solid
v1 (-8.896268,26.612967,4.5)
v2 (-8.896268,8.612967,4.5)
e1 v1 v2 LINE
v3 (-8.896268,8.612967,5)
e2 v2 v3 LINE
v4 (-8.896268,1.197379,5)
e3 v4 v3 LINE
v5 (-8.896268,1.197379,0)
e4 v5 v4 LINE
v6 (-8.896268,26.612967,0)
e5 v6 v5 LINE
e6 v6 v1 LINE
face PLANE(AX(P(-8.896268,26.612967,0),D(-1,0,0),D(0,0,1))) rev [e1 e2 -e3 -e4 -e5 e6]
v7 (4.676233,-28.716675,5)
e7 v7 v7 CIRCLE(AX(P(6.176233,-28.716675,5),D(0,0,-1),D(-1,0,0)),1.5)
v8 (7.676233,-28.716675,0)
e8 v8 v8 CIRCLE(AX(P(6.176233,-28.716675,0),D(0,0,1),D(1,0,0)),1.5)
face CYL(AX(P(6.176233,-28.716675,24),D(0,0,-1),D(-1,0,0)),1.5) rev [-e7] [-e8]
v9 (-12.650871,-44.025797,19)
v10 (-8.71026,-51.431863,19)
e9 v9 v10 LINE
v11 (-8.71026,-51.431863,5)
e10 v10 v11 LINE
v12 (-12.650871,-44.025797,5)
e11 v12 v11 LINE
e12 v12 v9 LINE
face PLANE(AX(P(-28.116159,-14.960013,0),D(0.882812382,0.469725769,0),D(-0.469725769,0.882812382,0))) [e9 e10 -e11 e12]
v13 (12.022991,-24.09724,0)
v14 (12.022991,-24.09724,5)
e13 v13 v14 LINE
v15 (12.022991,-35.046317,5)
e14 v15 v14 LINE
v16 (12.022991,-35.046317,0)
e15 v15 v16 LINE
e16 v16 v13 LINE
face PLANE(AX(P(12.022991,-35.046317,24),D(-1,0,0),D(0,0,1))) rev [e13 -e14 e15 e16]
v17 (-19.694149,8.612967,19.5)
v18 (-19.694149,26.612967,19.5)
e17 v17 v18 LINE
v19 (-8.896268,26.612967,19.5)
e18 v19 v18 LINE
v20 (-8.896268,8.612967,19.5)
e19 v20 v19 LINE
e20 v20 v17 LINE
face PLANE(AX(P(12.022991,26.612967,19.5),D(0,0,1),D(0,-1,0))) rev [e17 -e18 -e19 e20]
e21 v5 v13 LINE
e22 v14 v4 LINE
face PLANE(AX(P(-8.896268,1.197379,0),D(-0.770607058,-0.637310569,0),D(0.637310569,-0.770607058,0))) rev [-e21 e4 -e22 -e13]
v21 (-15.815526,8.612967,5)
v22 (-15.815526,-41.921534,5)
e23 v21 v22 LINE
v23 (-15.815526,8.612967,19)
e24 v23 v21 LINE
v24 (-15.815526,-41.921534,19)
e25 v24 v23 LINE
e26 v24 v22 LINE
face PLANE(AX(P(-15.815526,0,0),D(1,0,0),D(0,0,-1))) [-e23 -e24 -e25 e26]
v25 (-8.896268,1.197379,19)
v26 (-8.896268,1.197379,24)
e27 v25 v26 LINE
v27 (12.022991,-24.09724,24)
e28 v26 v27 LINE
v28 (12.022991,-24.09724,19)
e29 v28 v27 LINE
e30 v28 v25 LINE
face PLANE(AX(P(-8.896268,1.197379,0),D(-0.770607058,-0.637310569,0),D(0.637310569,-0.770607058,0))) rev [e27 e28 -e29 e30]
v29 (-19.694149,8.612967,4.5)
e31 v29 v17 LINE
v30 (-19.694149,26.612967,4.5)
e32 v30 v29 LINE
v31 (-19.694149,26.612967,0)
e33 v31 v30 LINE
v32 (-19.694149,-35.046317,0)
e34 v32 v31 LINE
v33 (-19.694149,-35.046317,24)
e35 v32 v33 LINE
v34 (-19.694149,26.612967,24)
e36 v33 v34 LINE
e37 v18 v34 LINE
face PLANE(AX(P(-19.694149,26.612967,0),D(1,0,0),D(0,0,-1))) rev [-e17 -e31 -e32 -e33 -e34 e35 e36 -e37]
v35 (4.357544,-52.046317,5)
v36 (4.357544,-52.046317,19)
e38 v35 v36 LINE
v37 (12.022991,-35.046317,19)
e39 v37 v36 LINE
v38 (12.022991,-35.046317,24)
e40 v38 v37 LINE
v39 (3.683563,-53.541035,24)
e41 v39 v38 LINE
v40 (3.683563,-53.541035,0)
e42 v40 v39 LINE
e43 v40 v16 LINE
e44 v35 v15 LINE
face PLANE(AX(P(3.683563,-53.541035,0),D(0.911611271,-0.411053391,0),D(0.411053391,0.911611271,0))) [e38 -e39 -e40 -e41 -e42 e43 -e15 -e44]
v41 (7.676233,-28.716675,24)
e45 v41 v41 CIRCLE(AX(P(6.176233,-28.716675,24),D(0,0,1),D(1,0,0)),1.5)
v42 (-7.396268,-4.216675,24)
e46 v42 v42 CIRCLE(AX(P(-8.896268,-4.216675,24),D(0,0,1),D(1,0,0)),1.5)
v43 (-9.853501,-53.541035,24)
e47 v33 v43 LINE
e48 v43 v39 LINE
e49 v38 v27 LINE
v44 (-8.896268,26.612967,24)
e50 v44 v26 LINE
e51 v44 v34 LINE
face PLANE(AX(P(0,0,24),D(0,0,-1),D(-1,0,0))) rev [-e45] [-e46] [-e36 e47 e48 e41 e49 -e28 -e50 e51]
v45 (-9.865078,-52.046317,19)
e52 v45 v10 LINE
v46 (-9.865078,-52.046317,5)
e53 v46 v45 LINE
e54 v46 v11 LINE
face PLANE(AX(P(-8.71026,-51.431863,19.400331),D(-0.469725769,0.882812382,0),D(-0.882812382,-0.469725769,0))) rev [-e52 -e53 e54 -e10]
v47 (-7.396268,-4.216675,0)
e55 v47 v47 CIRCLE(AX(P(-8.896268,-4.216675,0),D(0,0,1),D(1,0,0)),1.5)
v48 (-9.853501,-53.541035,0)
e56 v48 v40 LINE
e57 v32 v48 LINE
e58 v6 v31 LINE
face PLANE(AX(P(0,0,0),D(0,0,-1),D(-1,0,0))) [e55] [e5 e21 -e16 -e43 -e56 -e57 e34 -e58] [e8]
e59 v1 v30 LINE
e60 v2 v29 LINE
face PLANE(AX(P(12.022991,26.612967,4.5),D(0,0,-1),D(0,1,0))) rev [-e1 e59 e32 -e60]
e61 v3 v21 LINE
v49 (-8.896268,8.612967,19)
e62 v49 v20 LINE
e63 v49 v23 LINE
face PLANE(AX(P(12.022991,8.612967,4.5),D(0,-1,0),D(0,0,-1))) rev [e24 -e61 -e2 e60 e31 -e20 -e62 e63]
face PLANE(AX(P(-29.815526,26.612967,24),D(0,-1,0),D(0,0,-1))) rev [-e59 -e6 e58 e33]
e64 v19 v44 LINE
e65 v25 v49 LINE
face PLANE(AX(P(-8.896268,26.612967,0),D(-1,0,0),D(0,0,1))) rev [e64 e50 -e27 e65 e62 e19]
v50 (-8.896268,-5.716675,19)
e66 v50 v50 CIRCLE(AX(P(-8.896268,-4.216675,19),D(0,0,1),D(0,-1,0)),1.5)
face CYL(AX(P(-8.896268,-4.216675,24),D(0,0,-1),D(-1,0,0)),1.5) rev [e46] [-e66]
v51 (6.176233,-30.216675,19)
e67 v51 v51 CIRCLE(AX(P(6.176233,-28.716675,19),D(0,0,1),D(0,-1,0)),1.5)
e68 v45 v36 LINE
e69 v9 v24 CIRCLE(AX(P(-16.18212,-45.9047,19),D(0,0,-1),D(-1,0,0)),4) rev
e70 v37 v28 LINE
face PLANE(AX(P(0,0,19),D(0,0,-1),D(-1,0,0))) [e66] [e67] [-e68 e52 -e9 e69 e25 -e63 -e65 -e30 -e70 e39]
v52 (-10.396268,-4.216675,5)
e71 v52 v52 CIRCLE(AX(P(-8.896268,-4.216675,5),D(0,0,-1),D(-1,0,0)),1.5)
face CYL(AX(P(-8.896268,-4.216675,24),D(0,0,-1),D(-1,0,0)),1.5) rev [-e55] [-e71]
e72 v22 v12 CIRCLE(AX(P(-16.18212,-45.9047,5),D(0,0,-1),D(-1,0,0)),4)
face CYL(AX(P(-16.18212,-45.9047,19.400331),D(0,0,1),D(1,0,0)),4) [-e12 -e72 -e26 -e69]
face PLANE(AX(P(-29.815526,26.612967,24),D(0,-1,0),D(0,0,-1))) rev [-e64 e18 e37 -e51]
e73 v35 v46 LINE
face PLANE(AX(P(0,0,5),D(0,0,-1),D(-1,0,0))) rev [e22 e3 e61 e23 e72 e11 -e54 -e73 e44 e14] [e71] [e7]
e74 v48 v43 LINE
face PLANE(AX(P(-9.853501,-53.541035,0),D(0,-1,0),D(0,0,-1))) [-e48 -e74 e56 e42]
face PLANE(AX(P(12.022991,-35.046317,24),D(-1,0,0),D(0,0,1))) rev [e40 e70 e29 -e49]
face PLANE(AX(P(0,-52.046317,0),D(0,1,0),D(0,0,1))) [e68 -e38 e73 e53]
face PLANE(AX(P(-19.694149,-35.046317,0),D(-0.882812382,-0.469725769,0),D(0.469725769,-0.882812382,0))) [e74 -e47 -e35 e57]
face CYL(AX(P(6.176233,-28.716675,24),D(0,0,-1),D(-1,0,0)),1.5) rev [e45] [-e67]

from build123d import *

# Parameters (mm, degrees)
SKETCH_1_W          = 41.838517058
SKETCH_1_H          = 61.659283987
SKETCH_1_R          = 1.5
EXTRUDE_1_DEPTH     = 24
SHELL_START         = 5
SHELL_2_OUTLINE_R   = 6.5
SHELL_2_DEPTH       = 14
SKETCH_7_W          = 14
SKETCH_7_H          = 61.659283987
CUT_EXTRUDE_2_DEPTH = 38
SKETCH_11_W         = 14
SKETCH_11_H         = 61.659283987
EXTRUDE_2_DEPTH     = 14
SKETCH_12_W         = 10.1213772
SKETCH_12_H         = 61.659283987
CUT_EXTRUDE_3_DEPTH = 52.896145639
CUT_EXTRUDE_5_DEPTH = 47.819908548
SKETCH_18_W         = 15
SKETCH_18_H         = 18
CUT_EXTRUDE_6_DEPTH = 54.011520411
EXTRUDE_5_DEPTH     = 24
SKETCH_22_W         = 27.838517058
SKETCH_22_H         = 14
CUT_EXTRUDE_8_DEPTH = 17
SKETCH_23_W         = 14.991158549
SKETCH_23_H         = 11.73336261
EXTRUDE_8_DEPTH     = 2
FILLET_3_R          = 4


# Read off the part's stored shape, not the designer's step: 抽壳2
with BuildPart() as part:
    # 草图1 → 凸台-拉伸1 (new body)
    with BuildSketch(Plane.XY):
        with Locations((-8.896267572, -4.216675009)):
            Rectangle(SKETCH_1_W, SKETCH_1_H)
        with Locations((-8.896267572, -4.21667501)):
            Circle(SKETCH_1_R, mode=Mode.SUBTRACT)
        with Locations((6.176232993, -28.71667501)):
            Circle(SKETCH_1_R, mode=Mode.SUBTRACT)
    extrude(amount=EXTRUDE_1_DEPTH)

    # 抽壳2 outline → 抽壳2 (cut)
    # profile 1 of 2: a face of its own
    with BuildSketch(Plane.XY.offset(SHELL_START)):
        with BuildLine():
            Line((-24.815526101, 26.612966984), (-24.815526101, -35.046317003))
            Line((-24.815526101, -35.046317003), (4.697844602, -35.046317003))
            ThreePointArc((4.697844602, -35.046317003), (1.097738874, -24.659718332), (12.022990957, -25.876706469))
            Line((12.022990957, -25.876706469), (12.022990957, 26.612966984))
            Line((12.022990957, 26.612966984), (-24.815526101, 26.612966984))
        make_face()
        with Locations((-8.896267572, -4.21667501)):
            Circle(SHELL_2_OUTLINE_R, mode=Mode.SUBTRACT)
    # profile 2 of 2: a face of its own
    with BuildSketch(Plane.XY.offset(SHELL_START)):
        with BuildLine():
            ThreePointArc((12.022990957, -31.556643551), (10.23318967, -33.795169129), (7.654621384, -35.046317003))
            Line((7.654621384, -35.046317003), (12.022990957, -35.046317003))
            Line((12.022990957, -35.046317003), (12.022990957, -31.556643551))
        make_face()
    extrude(amount=SHELL_2_DEPTH, mode=Mode.SUBTRACT)

    # 草图7 → 切除-拉伸2 (cut)
    with BuildSketch(Plane(origin=(12.022990957, 0, 0), x_dir=(0, 0, -1), z_dir=(1, 0, 0))):
        with Locations((-12, -4.216675009)):
            Rectangle(SKETCH_7_W, SKETCH_7_H)
    extrude(amount=-CUT_EXTRUDE_2_DEPTH, mode=Mode.SUBTRACT)

    # 草图11 → 凸台-拉伸2 (add)
    with BuildSketch(Plane.ZY.offset(29.815526101)):
        with Locations((12, -4.216675009)):
            Rectangle(SKETCH_11_W, SKETCH_11_H)
    extrude(amount=-EXTRUDE_2_DEPTH)

    # 草图12 → 切除-拉伸3 (cut, through all)
    with BuildSketch(Plane.XY.offset(24)):
        with Locations((-24.754837501, -4.216675009)):
            Rectangle(SKETCH_12_W, SKETCH_12_H)
    extrude(amount=-CUT_EXTRUDE_3_DEPTH, mode=Mode.SUBTRACT)

    # 草图17 → 切除-拉伸5 (cut, through all)
    with BuildSketch(Plane.XY.offset(24)):
        Polygon((-8.896267572, 26.612966984), (-8.896267572, 1.197379191), (12.022990957, -24.097240197), (12.022990957, 26.612966984), align=None)
    extrude(amount=-CUT_EXTRUDE_5_DEPTH, mode=Mode.SUBTRACT)

    # 草图18 → 切除-拉伸6 (cut, through all)
    with BuildSketch(Plane.ZY.offset(19.694148901)):
        with Locations((12, 17.612966984)):
            Rectangle(SKETCH_18_W, SKETCH_18_H)
    extrude(amount=-CUT_EXTRUDE_6_DEPTH, mode=Mode.SUBTRACT)

    # 草图20 → 凸台-拉伸5 (add)
    with BuildSketch(Plane.XY.offset(24)):
        Polygon((-19.694148901, -35.046317003), (-9.853501275, -53.541034872), (3.683563025, -53.541034872), (12.022990957, -35.046317003), align=None)
    extrude(amount=-EXTRUDE_5_DEPTH)

    # 草图22 → 切除-拉伸8 (cut)
    with BuildSketch(Plane(origin=(0, -35.046317003, 0), x_dir=(1, 0, 0), z_dir=(0, 1, 0))):
        with Locations((-1.896267572, -12)):
            Rectangle(SKETCH_22_W, SKETCH_22_H)
    extrude(amount=-CUT_EXTRUDE_8_DEPTH, mode=Mode.SUBTRACT)

    # 草图23 → 凸台-拉伸8 (add)
    with BuildSketch(Plane(origin=(-29.881783728, -15.899464172, 0), x_dir=(0, 0, -1), z_dir=(0.8828123820911005, 0.469725768961675, 0))):
        with Locations((-11.904751729, -35.446570554)):
            Rectangle(SKETCH_23_W, SKETCH_23_H)
    extrude(amount=EXTRUDE_8_DEPTH)

    # 圆角3
    # the kernel refuses this fillet: 4 mm, written as the material it takes off along each edge
    with BuildSketch(Plane(origin=(-14.221722741, -41.073505124, 19), x_dir=(-0.8828123820904301, -0.4697257689629349, 0), z_dir=(0, 0, -1))) as fillet_3_piece_1:
        with BuildLine():
            CenterArc((4, -3.344189139), FILLET_3_R, 123.274953356, 56.725046644)
            Line((0, -3.344189139), (-0.08, -3.344189139))
            Line((-0.08, -3.344189139), (-0.08, 0))
            Line((-0.08, 0), (0, 0.08))
            ThreePointArc((0, 0.08), (0.902685209, 0.08), (1.761477827, 0.066883783))
            Line((1.761477827, 0.066883783), (1.805370419, 0))
        make_face()
    extrude(amount=14, mode=Mode.SUBTRACT)


solid = part.part
